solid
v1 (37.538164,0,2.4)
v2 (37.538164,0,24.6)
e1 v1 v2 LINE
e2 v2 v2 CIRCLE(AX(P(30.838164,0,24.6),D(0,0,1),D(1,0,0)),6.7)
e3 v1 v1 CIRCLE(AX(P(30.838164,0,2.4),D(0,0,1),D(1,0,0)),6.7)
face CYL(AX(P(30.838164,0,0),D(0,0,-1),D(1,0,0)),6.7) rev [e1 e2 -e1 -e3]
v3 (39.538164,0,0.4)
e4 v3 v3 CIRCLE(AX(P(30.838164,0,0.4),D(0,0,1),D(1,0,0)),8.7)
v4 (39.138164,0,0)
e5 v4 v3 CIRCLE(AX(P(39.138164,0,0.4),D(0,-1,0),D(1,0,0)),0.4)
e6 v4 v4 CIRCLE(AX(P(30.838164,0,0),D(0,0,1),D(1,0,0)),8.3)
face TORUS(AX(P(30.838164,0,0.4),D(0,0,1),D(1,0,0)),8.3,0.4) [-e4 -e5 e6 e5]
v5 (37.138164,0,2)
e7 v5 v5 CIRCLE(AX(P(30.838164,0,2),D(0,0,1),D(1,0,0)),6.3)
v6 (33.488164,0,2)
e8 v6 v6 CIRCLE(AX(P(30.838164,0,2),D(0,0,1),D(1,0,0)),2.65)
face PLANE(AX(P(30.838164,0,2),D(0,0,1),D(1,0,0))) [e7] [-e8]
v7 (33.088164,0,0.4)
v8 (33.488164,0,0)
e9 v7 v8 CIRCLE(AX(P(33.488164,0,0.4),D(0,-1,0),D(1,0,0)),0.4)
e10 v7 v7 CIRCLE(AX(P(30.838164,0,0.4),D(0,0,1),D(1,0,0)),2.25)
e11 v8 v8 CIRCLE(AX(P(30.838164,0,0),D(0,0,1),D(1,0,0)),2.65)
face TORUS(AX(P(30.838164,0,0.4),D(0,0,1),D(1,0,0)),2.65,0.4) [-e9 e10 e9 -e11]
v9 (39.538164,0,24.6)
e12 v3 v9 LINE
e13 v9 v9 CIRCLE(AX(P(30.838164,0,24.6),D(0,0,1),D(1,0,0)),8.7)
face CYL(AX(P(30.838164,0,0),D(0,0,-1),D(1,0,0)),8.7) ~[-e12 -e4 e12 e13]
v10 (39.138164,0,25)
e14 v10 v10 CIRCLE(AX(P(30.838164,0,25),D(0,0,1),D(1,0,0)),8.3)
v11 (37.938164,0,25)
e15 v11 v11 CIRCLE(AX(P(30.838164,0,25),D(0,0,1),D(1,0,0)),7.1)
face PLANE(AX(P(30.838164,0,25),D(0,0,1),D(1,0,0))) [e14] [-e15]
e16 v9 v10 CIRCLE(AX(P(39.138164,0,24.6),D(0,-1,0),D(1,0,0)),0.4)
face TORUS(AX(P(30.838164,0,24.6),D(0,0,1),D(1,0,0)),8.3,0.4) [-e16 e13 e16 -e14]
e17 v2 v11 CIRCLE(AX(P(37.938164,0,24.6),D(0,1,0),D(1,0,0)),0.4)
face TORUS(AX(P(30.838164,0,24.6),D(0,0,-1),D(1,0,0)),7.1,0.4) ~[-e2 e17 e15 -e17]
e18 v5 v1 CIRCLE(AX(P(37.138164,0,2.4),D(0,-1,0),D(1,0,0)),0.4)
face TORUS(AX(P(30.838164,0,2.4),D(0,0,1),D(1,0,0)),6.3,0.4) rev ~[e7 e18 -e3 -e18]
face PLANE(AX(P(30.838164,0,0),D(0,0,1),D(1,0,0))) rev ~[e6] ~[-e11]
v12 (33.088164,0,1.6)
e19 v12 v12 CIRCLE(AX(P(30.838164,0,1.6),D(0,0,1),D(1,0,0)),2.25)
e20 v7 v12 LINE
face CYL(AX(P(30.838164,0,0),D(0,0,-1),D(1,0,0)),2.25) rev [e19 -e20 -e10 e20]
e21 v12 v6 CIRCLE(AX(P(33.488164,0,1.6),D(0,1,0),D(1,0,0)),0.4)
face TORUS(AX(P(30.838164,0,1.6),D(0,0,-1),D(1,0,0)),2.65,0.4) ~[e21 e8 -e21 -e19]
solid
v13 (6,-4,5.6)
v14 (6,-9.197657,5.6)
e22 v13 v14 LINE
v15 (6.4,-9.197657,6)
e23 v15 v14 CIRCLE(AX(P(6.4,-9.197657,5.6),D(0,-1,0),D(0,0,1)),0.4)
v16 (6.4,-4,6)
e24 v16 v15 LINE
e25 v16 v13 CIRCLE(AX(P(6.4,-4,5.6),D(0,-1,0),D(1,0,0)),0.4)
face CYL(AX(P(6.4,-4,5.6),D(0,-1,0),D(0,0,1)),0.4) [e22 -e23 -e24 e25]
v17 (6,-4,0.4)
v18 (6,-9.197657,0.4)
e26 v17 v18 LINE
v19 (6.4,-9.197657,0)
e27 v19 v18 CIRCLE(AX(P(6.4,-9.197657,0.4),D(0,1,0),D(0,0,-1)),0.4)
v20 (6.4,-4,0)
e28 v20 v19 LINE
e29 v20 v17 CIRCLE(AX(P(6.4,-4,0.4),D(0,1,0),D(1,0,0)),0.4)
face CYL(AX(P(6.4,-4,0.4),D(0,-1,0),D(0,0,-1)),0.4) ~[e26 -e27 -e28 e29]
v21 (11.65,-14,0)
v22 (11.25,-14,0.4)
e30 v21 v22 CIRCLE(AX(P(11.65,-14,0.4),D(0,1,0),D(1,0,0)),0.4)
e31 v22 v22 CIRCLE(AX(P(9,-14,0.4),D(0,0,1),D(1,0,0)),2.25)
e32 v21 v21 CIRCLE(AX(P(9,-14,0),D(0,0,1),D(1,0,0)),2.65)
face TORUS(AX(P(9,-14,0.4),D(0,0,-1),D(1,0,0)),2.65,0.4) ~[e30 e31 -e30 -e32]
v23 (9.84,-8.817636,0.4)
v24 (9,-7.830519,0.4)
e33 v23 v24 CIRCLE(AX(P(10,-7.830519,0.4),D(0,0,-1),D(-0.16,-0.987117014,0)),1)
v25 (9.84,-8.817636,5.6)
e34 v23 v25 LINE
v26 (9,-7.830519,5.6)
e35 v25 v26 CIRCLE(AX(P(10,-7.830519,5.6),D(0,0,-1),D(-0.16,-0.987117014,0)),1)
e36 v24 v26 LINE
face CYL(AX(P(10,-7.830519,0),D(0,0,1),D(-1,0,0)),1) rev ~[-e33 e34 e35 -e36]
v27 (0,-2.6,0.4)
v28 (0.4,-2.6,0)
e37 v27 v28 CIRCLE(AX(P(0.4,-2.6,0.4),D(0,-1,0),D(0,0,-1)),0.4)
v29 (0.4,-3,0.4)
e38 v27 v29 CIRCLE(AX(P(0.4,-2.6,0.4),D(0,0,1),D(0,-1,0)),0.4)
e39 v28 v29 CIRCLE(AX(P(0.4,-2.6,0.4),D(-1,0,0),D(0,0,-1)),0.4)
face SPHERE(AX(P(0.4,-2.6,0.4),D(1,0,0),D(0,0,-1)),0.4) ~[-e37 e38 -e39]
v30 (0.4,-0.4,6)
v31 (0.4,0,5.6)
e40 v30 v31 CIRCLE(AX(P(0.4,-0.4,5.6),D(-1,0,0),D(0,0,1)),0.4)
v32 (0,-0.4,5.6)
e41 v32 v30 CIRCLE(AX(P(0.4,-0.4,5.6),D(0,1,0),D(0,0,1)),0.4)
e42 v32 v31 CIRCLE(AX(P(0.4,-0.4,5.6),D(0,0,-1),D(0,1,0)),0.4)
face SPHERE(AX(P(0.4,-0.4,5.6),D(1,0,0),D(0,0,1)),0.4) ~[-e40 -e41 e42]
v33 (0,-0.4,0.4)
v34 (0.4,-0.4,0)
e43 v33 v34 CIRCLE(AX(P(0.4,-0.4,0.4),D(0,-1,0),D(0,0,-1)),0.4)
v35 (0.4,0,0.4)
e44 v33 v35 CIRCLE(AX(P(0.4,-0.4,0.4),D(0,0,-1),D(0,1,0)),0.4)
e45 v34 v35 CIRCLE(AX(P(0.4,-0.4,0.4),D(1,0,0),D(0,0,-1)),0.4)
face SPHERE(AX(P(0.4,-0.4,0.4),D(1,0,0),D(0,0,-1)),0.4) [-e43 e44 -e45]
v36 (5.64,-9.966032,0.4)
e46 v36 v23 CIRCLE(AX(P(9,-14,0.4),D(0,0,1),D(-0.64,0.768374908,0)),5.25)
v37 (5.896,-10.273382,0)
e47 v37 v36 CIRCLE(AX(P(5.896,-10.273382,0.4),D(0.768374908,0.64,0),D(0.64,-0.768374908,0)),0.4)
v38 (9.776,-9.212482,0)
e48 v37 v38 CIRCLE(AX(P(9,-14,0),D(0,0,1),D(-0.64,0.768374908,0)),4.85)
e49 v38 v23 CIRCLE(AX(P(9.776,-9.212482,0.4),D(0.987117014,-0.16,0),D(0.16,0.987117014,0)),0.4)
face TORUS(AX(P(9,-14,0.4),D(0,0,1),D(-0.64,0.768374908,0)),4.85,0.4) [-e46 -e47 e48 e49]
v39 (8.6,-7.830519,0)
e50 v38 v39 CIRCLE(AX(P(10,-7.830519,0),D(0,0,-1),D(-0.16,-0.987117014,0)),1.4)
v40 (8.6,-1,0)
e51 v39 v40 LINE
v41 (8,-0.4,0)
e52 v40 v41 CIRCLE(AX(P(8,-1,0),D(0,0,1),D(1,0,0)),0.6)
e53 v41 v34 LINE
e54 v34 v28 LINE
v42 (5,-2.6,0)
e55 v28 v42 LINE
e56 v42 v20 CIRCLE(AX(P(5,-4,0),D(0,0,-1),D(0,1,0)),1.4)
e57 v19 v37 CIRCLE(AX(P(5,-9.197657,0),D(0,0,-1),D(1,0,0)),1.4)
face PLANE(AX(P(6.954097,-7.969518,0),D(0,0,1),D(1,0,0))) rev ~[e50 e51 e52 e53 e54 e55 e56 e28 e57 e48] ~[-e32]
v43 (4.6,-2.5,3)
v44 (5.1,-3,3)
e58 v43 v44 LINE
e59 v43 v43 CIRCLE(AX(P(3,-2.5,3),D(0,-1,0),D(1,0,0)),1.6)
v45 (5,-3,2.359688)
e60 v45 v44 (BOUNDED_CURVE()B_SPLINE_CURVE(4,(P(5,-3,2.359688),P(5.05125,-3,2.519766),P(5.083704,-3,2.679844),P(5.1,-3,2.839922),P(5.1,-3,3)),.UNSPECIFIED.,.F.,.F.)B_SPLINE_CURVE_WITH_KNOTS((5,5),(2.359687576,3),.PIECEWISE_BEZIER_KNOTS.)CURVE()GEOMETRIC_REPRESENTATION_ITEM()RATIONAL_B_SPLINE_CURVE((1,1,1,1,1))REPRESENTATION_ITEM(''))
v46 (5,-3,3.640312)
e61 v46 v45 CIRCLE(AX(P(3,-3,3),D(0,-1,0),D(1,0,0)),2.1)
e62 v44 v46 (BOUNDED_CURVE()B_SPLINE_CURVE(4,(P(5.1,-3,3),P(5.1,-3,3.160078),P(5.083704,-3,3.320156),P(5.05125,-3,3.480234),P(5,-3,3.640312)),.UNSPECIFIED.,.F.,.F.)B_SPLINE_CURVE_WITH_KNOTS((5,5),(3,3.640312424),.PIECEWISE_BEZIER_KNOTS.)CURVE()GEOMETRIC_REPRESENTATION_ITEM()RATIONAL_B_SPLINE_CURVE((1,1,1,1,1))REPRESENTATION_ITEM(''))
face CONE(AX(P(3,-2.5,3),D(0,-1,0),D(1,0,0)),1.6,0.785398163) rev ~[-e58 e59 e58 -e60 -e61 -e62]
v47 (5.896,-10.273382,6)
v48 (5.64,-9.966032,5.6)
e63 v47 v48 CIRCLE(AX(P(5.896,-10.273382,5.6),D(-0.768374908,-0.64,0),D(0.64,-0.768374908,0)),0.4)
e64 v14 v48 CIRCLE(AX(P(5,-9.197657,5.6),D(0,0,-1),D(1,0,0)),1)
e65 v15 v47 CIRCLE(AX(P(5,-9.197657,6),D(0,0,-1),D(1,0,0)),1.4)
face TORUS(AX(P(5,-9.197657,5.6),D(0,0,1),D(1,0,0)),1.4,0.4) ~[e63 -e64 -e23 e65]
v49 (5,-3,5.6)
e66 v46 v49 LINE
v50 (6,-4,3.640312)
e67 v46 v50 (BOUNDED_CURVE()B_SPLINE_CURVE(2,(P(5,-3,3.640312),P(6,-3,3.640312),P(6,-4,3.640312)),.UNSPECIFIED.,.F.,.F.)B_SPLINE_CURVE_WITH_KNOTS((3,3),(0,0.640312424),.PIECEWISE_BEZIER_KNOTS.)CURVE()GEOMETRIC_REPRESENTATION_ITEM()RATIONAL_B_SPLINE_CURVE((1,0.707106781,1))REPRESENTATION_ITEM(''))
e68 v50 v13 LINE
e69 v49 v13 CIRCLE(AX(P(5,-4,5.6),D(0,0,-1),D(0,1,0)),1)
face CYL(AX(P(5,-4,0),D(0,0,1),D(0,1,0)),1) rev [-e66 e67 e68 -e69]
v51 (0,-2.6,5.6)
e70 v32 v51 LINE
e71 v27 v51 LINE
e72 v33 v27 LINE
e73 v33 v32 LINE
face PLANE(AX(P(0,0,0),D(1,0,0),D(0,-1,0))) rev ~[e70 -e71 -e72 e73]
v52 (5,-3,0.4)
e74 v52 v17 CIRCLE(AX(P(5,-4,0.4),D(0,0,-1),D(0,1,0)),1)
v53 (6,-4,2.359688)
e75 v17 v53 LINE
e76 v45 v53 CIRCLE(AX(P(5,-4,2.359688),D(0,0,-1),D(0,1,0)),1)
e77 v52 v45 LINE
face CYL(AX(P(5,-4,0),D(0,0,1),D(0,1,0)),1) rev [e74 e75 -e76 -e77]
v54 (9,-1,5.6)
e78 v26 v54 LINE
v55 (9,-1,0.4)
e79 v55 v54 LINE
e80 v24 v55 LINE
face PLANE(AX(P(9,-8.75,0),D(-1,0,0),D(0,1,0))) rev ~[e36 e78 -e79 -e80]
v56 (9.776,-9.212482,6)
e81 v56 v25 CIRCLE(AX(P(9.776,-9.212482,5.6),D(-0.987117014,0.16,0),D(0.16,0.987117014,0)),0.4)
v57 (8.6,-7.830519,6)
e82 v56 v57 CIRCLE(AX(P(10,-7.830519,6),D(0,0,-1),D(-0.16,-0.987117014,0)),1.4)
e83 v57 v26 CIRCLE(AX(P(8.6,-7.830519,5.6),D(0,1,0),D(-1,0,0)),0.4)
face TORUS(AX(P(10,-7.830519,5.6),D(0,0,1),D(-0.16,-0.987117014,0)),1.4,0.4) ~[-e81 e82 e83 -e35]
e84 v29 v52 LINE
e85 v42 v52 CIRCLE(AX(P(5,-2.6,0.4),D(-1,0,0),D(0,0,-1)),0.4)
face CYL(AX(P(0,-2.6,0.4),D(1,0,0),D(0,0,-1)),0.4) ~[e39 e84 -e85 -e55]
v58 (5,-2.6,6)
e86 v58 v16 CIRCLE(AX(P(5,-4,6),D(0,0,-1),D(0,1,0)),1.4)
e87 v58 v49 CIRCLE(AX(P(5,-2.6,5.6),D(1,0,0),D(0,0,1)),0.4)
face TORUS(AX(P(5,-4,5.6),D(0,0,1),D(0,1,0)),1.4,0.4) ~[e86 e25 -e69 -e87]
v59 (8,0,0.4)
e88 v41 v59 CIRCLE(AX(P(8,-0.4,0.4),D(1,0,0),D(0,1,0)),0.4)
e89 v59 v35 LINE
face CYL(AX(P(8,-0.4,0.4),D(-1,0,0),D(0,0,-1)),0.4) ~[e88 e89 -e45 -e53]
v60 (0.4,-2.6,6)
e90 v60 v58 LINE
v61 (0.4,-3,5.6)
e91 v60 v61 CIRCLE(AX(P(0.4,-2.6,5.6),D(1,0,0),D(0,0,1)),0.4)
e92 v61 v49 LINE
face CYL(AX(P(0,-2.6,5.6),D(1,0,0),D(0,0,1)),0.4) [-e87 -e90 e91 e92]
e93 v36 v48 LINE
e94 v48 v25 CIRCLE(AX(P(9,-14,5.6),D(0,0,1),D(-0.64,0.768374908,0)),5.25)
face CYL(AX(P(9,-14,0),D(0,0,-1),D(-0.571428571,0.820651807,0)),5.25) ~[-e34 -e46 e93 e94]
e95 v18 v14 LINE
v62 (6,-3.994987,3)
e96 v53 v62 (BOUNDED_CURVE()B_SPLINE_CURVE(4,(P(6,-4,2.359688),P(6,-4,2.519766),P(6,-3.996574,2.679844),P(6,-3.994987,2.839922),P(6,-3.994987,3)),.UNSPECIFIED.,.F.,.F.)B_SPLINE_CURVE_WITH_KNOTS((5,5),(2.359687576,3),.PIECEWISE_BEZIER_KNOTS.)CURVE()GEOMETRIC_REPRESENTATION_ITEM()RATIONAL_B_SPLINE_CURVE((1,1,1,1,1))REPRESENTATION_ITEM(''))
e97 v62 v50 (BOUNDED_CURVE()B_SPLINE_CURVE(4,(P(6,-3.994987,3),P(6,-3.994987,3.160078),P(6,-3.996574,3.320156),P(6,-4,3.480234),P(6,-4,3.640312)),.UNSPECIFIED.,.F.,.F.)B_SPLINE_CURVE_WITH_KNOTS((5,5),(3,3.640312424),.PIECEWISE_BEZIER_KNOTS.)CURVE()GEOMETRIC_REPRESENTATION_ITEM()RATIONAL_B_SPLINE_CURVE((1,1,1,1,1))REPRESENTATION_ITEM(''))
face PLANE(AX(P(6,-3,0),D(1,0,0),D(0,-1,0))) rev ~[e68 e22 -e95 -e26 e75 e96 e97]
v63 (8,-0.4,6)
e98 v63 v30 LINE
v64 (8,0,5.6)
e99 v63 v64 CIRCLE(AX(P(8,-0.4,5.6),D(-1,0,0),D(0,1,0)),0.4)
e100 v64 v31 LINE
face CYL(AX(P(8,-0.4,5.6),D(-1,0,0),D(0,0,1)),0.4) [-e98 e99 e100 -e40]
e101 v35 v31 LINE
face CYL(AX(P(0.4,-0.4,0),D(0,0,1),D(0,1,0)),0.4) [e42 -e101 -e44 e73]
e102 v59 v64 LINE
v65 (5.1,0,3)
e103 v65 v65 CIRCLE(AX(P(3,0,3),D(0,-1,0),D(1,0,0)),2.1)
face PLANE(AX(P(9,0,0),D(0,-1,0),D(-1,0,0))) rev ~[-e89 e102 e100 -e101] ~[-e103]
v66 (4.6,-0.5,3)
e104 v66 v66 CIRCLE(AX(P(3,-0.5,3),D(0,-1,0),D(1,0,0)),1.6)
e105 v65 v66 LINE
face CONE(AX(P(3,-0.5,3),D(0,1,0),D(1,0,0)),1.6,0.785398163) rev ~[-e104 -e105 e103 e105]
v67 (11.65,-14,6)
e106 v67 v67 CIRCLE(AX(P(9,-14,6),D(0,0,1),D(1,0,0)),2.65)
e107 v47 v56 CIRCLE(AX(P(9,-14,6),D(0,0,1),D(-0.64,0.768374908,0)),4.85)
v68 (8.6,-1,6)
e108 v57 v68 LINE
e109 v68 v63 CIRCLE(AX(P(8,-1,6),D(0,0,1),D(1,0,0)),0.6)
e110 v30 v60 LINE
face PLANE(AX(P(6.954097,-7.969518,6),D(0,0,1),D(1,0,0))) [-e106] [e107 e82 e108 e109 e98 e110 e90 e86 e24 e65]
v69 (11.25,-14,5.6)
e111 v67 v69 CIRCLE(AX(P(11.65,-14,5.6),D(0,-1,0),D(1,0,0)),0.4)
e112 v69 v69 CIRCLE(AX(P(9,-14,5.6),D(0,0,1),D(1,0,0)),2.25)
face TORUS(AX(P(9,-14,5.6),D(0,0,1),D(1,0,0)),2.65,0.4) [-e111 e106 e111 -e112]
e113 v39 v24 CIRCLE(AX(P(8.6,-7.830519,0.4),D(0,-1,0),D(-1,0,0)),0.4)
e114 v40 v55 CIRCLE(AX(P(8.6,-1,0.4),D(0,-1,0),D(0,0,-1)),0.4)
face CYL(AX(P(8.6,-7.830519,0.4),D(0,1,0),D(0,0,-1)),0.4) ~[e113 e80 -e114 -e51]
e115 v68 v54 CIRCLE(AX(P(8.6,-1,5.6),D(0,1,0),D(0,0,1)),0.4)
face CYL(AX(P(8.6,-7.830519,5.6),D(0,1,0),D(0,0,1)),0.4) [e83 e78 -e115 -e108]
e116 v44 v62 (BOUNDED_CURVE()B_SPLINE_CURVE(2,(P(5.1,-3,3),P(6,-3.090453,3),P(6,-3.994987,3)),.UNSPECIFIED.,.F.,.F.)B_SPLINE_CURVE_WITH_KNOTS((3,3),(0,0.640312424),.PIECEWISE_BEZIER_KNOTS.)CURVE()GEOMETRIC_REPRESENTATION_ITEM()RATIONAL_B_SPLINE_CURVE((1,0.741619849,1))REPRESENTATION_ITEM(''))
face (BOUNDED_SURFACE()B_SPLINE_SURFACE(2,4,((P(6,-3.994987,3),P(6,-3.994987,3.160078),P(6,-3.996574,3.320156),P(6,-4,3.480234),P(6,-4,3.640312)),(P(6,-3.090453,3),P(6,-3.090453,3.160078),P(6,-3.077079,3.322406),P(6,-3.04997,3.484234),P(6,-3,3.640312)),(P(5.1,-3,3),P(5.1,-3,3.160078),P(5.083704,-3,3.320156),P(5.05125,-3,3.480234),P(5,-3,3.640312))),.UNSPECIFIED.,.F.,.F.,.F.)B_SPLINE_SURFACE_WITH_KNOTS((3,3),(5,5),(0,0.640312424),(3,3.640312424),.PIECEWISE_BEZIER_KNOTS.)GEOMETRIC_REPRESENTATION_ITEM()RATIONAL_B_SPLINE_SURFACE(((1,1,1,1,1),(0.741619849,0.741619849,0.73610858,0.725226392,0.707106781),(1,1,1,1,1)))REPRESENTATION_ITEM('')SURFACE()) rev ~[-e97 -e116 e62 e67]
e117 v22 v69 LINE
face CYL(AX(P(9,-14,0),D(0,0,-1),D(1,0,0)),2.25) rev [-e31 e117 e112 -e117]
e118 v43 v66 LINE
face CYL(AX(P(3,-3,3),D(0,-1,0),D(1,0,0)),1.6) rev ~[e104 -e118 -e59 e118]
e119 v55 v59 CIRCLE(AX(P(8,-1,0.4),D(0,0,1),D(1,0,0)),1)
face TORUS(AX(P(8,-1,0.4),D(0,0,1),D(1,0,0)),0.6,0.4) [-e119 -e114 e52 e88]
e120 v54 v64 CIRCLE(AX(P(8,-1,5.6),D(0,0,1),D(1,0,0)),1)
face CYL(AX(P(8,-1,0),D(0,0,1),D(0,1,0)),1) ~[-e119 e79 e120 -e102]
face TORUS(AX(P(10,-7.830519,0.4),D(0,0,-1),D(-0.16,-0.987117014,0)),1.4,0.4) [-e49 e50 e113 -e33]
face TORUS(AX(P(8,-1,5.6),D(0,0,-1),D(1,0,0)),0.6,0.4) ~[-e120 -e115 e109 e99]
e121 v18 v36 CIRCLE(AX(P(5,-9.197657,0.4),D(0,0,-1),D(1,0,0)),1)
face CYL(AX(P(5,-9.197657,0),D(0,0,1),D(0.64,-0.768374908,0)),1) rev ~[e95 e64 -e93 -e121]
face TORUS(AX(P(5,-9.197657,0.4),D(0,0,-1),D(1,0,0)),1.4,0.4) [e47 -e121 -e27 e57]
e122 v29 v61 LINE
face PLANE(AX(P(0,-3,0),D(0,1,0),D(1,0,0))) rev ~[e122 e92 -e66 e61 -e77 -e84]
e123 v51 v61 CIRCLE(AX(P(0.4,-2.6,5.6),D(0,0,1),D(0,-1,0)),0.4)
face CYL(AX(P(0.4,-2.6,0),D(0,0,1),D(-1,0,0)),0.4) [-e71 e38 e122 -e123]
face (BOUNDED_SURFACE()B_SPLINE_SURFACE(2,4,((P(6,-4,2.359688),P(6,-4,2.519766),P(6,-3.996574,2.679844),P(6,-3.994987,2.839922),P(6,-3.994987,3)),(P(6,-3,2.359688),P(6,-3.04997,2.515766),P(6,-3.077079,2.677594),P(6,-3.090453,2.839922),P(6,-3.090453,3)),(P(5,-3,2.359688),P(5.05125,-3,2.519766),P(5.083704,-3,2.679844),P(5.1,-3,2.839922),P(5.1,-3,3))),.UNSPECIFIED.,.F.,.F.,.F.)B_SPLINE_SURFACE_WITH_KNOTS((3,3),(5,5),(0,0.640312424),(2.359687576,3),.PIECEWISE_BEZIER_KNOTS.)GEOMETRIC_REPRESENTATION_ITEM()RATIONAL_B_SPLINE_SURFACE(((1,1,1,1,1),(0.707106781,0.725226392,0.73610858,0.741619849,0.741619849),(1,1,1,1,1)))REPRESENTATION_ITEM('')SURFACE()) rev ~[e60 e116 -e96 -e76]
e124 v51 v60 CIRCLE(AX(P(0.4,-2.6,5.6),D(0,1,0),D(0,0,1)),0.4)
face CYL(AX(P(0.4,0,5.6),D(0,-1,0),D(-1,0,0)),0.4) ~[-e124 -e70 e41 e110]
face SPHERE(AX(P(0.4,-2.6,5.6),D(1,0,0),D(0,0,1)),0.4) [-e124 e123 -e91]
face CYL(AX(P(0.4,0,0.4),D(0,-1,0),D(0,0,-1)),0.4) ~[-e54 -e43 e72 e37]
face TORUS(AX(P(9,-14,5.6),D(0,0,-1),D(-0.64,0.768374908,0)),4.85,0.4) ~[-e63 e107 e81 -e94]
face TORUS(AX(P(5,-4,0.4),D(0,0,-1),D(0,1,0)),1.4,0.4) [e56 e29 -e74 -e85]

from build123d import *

# Parameters (mm, degrees)
F0_R     = 2.25
F1_DEPTH = 6
F2_R     = 1.6
F3_DEPTH = 3.001
F4_SIZE  = 0.5
F5_R     = 1
F6_R     = 0.4
F0_R_2   = 8.7
F0_R_3   = 6.7
F7_DEPTH = 25
F8_DEPTH = 2
F9_R     = 0.4


# Not quite as in the source:
# - a feature names something its author has since deleted; it is built from what else it names


with BuildPart() as f1:
    # F0 (on Top) → F1 (new body)
    with BuildSketch(Plane.XY):
        with BuildLine():
            Line((9, 0), (0, 0))
            Line((0, 0), (0, -3))
            Line((0, -3), (6, -3))
            Line((6, -3), (6, -9.6915780151))
            ThreePointArc((6, -9.6915780151), (10.5721457597, -19.0090775309), (9, -8.75))
            Line((9, -8.75), (9, 0))
        make_face()
        with Locations((9, -14)):
            Circle(F0_R, mode=Mode.SUBTRACT)
    extrude(amount=F1_DEPTH)

    # F2 (on face) → F3 (cut, through all)
    with BuildSketch(Plane.XZ.offset(3)):
        with Locations((3, 3)):
            Circle(F2_R)
    extrude(amount=-F3_DEPTH, mode=Mode.SUBTRACT)

    # F4
    f4_edges = [f1.edges().sort_by_distance(p)[0] for p in [
        (1.4, -3, 3),
        (1.4, 0, 3),
    ]]
    chamfer(f4_edges, length=F4_SIZE)

    # F5
    f5_edges = [f1.edges().sort_by_distance(p)[0] for p in [
        (6, -3, 3),
        (9, 0, 3),
        (9, -8.75, 3),
        (6, -9.691578, 3),
    ]]
    fillet(f5_edges, radius=F5_R)

    # F6
    f6_edges = [f1.edges().sort_by_distance(p)[0] for p in [
        (9, -4.415259, 6),
        (9.238423, -8.478593, 6),
        (8.707107, -0.292893, 6),
        (10.384667, -19.064109, 6),
        (4, 0, 6),
        (5.905539, -9.621921, 6),
        (0, -1.5, 6),
        (6, -6.598828, 6),
        (2.5, -3, 6),
        (5.707107, -3.292893, 6),
        (6.75, -14, 6),
        (9, -4.415259, 0),
        (9.238423, -8.478593, 0),
        (8.707107, -0.292893, 0),
        (10.384667, -19.064109, 0),
        (4, 0, 0),
        (5.905539, -9.621921, 0),
        (0, -1.5, 0),
        (6, -6.598828, 0),
        (2.5, -3, 0),
        (5.707107, -3.292893, 0),
        (6.75, -14, 0),
        (0, 0, 3),
        (0, -3, 3),
    ]]
    fillet(f6_edges, radius=F6_R)


with BuildPart() as f7:
    # F0 (on Top) → F7 (new body)
    with BuildSketch(Plane.XY):
        with Locations((30.8381635696, 0)):
            Circle(F0_R_2)
        with Locations((30.8381635696, 0)):
            Circle(F0_R_3, mode=Mode.SUBTRACT)
    extrude(amount=F7_DEPTH)

    # F0 (on Top) → F8 (join)
    with BuildSketch(Plane.XY):
        with Locations((30.8381635696, 0)):
            Circle(F0_R_3)
        with Locations((30.8381635696, 0)):
            Circle(F0_R, mode=Mode.SUBTRACT)
    extrude(amount=F8_DEPTH)

    # F9
    f9_edges = [f7.edges().sort_by_distance(p)[0] for p in [
        (22.138164, 0, 0),
        (28.588164, 0, 0),
        (24.138164, 0, 2),
        (28.588164, 0, 2),
        (22.138164, 0, 25),
        (24.138164, 0, 25),
    ]]
    fillet(f9_edges, radius=F9_R)


solid = Compound([f1.part, f7.part])
